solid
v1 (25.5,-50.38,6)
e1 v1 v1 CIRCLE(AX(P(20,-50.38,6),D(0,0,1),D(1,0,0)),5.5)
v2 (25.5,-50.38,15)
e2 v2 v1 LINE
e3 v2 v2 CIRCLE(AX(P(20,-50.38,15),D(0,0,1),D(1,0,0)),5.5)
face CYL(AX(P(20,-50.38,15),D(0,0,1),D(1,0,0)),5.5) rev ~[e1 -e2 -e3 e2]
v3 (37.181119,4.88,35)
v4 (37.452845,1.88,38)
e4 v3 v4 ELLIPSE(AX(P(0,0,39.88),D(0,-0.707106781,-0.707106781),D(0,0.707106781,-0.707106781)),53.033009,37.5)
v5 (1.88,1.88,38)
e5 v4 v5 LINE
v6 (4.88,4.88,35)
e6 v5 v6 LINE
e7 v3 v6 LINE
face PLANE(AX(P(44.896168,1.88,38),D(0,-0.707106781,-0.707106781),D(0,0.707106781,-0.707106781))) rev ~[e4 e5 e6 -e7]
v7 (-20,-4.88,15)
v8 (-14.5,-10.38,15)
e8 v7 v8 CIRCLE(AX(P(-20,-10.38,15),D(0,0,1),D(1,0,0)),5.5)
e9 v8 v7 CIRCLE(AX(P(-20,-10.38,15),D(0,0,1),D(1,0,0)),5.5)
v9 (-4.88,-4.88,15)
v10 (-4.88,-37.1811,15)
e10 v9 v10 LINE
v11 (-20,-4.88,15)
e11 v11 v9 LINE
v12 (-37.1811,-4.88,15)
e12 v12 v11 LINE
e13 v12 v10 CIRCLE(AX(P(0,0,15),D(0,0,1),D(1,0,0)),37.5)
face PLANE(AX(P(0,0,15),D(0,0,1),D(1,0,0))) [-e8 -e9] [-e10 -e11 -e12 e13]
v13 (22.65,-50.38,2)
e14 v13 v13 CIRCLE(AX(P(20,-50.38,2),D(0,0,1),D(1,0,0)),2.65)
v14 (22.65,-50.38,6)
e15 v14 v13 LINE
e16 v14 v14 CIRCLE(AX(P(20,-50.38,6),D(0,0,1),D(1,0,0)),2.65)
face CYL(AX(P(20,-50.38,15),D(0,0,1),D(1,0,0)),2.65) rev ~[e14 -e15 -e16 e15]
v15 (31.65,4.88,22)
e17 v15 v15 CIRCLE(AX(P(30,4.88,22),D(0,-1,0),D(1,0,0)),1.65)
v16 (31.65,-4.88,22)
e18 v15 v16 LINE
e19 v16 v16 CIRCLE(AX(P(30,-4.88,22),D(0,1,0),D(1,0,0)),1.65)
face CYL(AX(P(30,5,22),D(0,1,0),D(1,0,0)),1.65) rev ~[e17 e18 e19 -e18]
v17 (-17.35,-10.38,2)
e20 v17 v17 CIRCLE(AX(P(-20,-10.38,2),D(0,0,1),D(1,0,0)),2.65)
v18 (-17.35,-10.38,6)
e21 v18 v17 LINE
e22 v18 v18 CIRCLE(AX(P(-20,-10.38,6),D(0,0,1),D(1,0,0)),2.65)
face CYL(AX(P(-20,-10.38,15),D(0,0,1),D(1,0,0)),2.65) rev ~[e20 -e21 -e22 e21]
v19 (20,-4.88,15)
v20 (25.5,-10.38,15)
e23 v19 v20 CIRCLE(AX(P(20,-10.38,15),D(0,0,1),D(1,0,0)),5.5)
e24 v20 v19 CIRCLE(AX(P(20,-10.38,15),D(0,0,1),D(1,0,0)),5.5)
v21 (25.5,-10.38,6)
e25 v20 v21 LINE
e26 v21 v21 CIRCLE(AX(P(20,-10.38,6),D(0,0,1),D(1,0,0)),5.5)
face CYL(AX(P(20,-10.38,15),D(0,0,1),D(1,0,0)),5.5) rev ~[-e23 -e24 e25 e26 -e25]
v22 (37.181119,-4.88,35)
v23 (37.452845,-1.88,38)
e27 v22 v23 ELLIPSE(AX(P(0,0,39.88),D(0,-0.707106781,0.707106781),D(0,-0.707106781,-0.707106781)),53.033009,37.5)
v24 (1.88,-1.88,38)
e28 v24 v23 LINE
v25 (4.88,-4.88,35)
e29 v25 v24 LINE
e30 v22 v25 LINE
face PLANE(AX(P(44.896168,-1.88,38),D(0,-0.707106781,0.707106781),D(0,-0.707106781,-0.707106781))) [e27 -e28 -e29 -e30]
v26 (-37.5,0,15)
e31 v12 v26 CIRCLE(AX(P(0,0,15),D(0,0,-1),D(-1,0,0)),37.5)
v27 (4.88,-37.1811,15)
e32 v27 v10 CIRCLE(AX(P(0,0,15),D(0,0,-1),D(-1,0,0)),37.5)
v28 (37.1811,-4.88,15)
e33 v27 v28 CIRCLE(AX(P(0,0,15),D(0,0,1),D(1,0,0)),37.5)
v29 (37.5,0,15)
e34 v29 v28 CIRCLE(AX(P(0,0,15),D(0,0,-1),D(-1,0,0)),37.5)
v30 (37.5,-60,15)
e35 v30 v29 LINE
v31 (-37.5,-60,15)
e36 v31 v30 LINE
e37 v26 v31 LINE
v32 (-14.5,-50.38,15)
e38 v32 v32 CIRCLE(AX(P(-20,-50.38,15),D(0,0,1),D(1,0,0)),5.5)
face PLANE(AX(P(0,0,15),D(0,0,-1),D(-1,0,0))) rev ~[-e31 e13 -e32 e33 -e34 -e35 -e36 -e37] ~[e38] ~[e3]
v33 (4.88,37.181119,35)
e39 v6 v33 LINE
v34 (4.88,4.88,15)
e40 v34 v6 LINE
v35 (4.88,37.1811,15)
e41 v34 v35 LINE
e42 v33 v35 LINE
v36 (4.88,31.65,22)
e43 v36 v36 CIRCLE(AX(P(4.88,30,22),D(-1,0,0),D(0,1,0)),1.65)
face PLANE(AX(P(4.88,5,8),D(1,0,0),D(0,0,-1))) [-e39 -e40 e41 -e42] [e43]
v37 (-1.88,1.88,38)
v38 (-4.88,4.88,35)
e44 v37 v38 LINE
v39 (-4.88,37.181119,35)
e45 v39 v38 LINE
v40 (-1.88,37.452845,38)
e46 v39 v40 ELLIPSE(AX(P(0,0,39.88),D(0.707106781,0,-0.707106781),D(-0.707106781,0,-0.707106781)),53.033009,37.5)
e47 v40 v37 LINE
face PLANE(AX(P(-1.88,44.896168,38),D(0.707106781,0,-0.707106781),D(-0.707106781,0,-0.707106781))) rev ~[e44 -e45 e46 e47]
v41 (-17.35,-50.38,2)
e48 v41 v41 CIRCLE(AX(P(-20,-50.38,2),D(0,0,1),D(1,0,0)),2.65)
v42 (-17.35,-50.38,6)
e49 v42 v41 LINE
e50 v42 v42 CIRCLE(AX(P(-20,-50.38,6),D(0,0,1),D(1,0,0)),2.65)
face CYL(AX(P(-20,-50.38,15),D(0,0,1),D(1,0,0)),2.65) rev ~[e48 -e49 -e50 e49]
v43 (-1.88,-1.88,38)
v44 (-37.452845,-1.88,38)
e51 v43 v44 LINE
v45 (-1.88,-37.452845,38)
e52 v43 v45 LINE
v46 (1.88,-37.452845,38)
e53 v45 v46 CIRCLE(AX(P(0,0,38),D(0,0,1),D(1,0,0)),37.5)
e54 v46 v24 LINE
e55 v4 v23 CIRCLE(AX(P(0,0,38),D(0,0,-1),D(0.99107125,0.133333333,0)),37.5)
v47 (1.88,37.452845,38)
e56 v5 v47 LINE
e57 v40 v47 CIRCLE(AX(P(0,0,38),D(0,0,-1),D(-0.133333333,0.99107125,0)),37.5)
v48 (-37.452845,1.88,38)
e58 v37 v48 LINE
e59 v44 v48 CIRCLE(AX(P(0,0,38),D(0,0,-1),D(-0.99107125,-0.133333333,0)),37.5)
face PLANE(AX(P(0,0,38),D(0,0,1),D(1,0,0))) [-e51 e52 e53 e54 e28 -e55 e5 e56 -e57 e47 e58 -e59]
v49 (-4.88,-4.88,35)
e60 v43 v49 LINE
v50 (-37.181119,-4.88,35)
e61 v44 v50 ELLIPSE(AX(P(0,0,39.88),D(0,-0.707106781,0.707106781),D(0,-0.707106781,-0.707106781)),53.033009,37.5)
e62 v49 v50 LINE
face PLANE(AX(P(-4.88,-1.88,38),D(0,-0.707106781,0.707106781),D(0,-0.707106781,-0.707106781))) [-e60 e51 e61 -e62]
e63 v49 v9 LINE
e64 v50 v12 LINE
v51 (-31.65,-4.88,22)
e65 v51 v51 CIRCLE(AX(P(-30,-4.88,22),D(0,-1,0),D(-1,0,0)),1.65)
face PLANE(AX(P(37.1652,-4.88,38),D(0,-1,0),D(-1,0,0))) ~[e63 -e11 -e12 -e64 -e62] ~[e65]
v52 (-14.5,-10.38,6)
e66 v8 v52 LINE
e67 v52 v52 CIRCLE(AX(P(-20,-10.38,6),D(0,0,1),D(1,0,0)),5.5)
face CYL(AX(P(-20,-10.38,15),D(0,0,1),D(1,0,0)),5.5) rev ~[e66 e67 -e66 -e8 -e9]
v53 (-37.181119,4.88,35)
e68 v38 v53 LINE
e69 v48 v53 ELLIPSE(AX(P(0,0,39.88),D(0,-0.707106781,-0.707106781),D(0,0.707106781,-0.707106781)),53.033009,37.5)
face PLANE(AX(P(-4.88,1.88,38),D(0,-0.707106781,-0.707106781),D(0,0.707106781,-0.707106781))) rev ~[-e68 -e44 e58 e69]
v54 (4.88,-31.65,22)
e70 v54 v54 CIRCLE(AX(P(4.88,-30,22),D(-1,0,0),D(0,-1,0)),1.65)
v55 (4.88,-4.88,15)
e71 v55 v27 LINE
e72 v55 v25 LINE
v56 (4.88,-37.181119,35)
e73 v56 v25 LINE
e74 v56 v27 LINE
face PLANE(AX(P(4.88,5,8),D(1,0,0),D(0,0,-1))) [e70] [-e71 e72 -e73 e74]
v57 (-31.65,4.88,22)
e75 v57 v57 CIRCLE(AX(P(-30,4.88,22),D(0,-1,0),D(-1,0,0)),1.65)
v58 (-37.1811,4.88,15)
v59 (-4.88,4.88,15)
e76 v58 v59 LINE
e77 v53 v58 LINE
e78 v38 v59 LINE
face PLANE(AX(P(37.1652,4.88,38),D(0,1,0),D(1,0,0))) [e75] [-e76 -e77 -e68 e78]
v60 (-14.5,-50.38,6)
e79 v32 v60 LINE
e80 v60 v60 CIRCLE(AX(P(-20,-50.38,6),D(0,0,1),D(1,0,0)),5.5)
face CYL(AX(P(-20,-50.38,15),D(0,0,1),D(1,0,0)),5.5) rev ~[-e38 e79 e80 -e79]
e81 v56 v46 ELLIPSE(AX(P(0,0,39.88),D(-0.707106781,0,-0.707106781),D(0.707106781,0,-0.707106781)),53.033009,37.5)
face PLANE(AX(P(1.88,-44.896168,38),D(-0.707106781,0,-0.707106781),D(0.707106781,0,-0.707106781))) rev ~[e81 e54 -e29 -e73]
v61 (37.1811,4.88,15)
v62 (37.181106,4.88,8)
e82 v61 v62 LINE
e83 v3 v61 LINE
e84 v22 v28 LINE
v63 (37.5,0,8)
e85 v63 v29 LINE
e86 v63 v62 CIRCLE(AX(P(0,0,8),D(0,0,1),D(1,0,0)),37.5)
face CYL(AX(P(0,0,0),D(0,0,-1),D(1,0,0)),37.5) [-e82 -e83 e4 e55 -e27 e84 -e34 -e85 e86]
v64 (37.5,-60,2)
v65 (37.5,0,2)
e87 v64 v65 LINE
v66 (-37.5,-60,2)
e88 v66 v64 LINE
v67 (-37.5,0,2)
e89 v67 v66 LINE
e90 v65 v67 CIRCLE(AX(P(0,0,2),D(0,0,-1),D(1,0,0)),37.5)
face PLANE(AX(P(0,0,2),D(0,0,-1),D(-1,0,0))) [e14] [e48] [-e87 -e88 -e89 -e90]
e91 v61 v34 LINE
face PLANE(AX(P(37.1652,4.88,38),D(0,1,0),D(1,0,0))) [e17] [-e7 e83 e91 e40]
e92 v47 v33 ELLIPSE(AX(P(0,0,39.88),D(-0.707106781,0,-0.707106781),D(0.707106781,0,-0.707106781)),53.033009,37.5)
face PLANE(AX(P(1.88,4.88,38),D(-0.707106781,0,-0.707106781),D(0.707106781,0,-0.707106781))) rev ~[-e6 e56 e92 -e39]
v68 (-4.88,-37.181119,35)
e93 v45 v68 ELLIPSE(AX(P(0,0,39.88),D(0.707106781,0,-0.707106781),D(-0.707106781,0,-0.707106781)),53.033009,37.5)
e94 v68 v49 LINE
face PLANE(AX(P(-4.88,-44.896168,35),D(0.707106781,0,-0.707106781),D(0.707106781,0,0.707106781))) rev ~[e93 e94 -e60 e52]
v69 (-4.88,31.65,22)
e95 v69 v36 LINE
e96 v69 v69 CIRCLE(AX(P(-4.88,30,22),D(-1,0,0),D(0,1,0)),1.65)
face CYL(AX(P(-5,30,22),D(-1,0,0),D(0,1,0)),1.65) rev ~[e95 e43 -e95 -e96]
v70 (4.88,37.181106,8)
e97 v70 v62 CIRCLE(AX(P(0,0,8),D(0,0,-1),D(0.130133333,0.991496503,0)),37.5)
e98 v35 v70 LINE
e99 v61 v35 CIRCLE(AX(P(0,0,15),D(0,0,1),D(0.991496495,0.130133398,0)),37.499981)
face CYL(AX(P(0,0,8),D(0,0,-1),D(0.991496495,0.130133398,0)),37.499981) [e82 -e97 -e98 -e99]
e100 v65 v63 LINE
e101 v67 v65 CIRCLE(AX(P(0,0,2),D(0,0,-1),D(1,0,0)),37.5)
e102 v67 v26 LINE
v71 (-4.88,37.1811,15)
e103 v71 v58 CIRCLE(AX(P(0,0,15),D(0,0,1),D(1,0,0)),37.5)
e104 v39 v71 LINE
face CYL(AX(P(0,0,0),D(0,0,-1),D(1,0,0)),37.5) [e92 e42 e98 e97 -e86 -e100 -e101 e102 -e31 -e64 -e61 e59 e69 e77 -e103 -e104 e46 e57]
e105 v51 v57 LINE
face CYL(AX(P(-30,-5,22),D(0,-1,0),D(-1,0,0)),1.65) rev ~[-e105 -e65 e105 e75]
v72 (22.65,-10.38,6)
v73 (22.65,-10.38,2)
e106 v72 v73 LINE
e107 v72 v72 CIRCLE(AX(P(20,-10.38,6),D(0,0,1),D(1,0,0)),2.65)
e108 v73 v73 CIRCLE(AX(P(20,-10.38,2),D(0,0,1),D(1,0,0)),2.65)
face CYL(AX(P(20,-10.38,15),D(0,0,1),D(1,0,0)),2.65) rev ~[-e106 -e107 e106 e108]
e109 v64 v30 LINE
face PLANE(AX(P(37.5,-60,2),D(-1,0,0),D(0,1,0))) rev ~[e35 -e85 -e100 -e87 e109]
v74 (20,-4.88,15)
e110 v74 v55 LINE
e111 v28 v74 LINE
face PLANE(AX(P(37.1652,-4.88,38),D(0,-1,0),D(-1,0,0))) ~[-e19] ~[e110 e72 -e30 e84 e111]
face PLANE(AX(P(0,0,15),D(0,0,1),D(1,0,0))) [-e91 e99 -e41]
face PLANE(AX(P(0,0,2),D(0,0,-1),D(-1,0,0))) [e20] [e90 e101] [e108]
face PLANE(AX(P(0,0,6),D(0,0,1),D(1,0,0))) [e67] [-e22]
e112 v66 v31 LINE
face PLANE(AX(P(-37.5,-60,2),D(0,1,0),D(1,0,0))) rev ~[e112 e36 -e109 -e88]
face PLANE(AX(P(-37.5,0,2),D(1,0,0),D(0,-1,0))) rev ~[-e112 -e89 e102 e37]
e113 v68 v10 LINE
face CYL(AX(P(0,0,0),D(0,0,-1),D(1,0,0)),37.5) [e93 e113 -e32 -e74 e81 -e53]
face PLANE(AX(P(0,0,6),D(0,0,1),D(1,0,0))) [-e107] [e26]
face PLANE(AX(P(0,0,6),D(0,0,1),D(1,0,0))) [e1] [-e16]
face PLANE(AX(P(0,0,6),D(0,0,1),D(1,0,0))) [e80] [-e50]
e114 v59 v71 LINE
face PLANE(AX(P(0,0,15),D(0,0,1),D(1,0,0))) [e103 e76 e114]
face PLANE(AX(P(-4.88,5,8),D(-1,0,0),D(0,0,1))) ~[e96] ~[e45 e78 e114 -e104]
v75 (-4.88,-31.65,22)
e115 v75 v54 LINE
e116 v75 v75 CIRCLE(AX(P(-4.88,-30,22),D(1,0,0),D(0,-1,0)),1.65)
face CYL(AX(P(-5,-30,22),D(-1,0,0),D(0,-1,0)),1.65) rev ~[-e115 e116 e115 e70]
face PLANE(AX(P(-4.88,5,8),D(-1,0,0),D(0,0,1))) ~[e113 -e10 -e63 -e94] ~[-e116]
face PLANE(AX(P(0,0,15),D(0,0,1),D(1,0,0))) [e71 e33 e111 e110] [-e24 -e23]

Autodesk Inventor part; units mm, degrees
ref_plane "YZ Plane" through (0, 0, 0) normal (1, 0, 0) x (0, 1, 0)
ref_plane "XZ Plane" through (0, 0, 0) normal (0, 1, 0) x (-1, 0, 0)
ref_plane "XY Plane" through (0, 0, 0) normal (0, 0, 1) x (1, 0, 0)
sketch "Sketch1" plane through (0, 0, 0) normal (0, 0, 1) x (1, 0, 0)
  circle A0 centre (0, 0) radius 37.5
  line L0 (0, 0) -> (0, -25)
  circle A1 centre (0, -25) radius 3
  dimension "d0" = 75
  dimension "d1" = 25
  dimension "d2" = 6
extrude "Extrusion1" add sketch "Sketch1" along normal blind 8 contours A0 | A1
sketch "Sketch2" plane through (0, 0, 8) normal (0, 0, 1) x (1, 0, 0)
  line L0 (0, 0) -> (17.6777, 17.6777)
  line L1 (0, 0) -> (25, 0) construction
  circle A0 centre (17.6777, 17.6777) radius 3.15
  circle A1 centre (-17.6777, 17.6777) radius 3.15
  circle A2 centre (-17.6777, -17.6777) radius 3.15
  circle A3 centre (17.6777, -17.6777) radius 3.15
  dimension "d5" = 25
  dimension "d6" = 45
  dimension "d7" = 6.3
  dimension "d10" = 360
extrude "Extrusion2" cut sketch "Sketch2" against normal blind 10
sketch "Sketch3" plane through (0, 0, 8) normal (0, 0, 1) x (1, 0, 0)
  arc A0 (-21.9203, 13.435) -> (-13.435, 21.9203) centre (-17.6777, 17.6777) ccw
  line L0 (-17.6777, 17.6777) -> (-11.6777, 17.6777) construction
  line L1 (-13.435, 21.9203) -> (-19.9189, 28.4042)
  line L2 (-21.9203, 13.435) -> (-28.4042, 19.9189)
  line L3 (-28.4042, 19.9189) -> (-19.9189, 28.4042)
  arc A1 (-13.435, -21.9203) -> (-21.9203, -13.435) centre (-17.6777, -17.6777) ccw
  line L4 (-17.6777, -17.6777) -> (-17.6777, -11.6777) construction
  line L5 (-21.9203, -13.435) -> (-28.4042, -19.9189)
  line L6 (-13.435, -21.9203) -> (-19.9189, -28.4042)
  line L7 (-19.9189, -28.4042) -> (-28.4042, -19.9189)
  arc A2 (21.9203, -13.435) -> (13.435, -21.9203) centre (17.6777, -17.6777) ccw
  line L8 (17.6777, -17.6777) -> (11.6777, -17.6777) construction
  line L9 (13.435, -21.9203) -> (19.9189, -28.4042)
  line L10 (21.9203, -13.435) -> (28.4042, -19.9189)
  line L11 (28.4042, -19.9189) -> (19.9189, -28.4042)
  arc A3 (13.435, 21.9203) -> (21.9203, 13.435) centre (17.6777, 17.6777) ccw
  line L12 (17.6777, 17.6777) -> (17.6777, 11.6777) construction
  line L13 (21.9203, 13.435) -> (28.4042, 19.9189)
  line L14 (13.435, 21.9203) -> (19.9189, 28.4042)
  line L15 (19.9189, 28.4042) -> (28.4042, 19.9189)
  circle A4 centre (0, 0) radius 31.5
  point P0 (-26.1087, 17.6234)
  point P1 (-26.1087, -17.6234)
  point P2 (-17.6234, -26.1087)
  point P3 (17.6234, -26.1087)
  point P4 (26.1087, -17.6234)
  point P5 (26.1087, 17.6234)
  point P6 (17.6234, 26.1087)
  point P7 (-17.6234, 26.1087)
  dimension "d14" = 12
  dimension "d18" = 360
sketch "Sketch4" plane through (0, 0, 0) normal (0, 0, -1) x (-1, 0, 0)
  circle A0 centre (0, 0) radius 42.8826
extrude "Extrusion4" cut sketch "Sketch4" against normal blind 2
sketch "Sketch5" plane through (0, 0, 8) normal (0, 0, 1) x (1, 0, 0)
  line L0 (0, 0) -> (8, 0)
  line L1 (8, 0) -> (8, -40)
  line L2 (8, -40) -> (-8, -40)
  line L3 (-8, -40) -> (-8, 40)
  line L4 (-8, 40) -> (8, 40)
  line L5 (8, 40) -> (8, -40)
  line L6 (0, 0) -> (0, 8)
  line L7 (0, 8) -> (40, 8)
  line L8 (40, 8) -> (40, -8)
  line L9 (40, -8) -> (-40, -8)
  line L10 (-40, -8) -> (-40, 8)
  line L11 (-40, 8) -> (40, 8)
  line L12 (0, 0) -> (0, 40)
  line L13 (0, 40) -> (-5, 40)
  line L14 (-5, 40) -> (5, 40)
  line L15 (5, 40) -> (5, -40)
  line L16 (5, -40) -> (-5, -40)
  line L17 (-5, -40) -> (-5, 40)
  point P0 (8, -8)
  point P1 (8, 8)
  point P2 (-8, 8)
  point P3 (-8, -8)
  dimension "d24" = 8
  dimension "d25" = 40
  dimension "d26" = 16
  dimension "d27" = 80
  dimension "d30" = 90
  dimension "d34" = 5
  dimension "d35" = 10
sketch "Sketch6" plane through (0, 0, 8) normal (0, 0, 1) x (1, 0, 0)
  line L0 (0, 0) -> (0, 40)
  line L1 (0, 40) -> (-5, 40)
  line L2 (-5, 40) -> (5, 40)
  line L3 (5, 40) -> (5, -40)
  line L4 (5, -40) -> (-5, -40)
  line L5 (-5, -40) -> (-5, 40)
  line L6 (0, 0) -> (-40, 0)
  line L7 (-40, 0) -> (-40, -5)
  line L8 (-40, -5) -> (-40, 5)
  line L9 (-40, 5) -> (40, 5)
  line L10 (40, 5) -> (40, -5)
  line L11 (40, -5) -> (-40, -5)
  circle A0 centre (0, 0) radius 37.5
  point P0 (5, -5)
  point P1 (5, 5)
  point P2 (-5, 5)
  point P3 (-5, -5)
  point P4 (37.1652, 5)
  point P5 (5, 37.1652)
  point P6 (-5, 37.1652)
  point P7 (-37.1652, 5)
  point P8 (-37.1652, -5)
  point P9 (-5, -37.1652)
  point P10 (5, -37.1652)
  point P11 (37.1652, -5)
  dimension "d36" = 40
  dimension "d37" = 5
  dimension "d38" = 10
  dimension "d39" = 80
  dimension "d42" = 90
  dimension "d46" = 75
extrude "Extrusion7" add sketch "Sketch6" along normal blind 30 contours L6 L5 L9 L0 | L0 L9 L3 L11 L5 L6 | L9 L5 A0 L0 | L0 A0 L3 L9 | L6 A0 L9 L5 | L5 L11 A0 L6 | L9 A0 L11 L3 | L11 L3 A0 L5
sketch "Sketch7" plane through (5, 5, 8) normal (0, 1, 0) x (1, 0, 0)
  line L0 (0, 0) -> (0, -30) projected
  line L1 (0, 0) -> (-5, 0)
  line L2 (-5, 0) -> (25, 0)
  line L3 (0, 0) -> (32.1652, 0) projected
  line L4 (25, 0) -> (25, -14)
  circle A0 centre (25, -14) radius 1.65
  point P0 (-5, 8)
  dimension "d49" = 5
  dimension "d50" = 30
  dimension "d51" = 14
  dimension "d52" = 3.3
extrude "Extrusion8" cut sketch "Sketch7" against normal blind 20
ref_plane "Work Plane1" through (5, 0, 8) normal (0, 1, 0) x (1, 0, 0)
ref_plane "Work Plane2" through (0, 5, 8) normal (1, 0, 0) x (0, 0, -1)
pattern_circular "Circular Pattern2" count 2 over 90 about axis through (0, 0, 8) along (0, 0, 1) of "Extrusion8"
sketch "Sketch8" plane through (-37.1652, 5, 8) normal (0, 1, 0) x (1, 0, 0)
  line L0 (32.1652, 0) -> (32.1652, -30) projected
  line L1 (32.1652, 0) -> (37.1652, 0)
  line L2 (37.1652, 0) -> (5.9902, 0)
  line L3 (22.6375, 0) -> (16.3375, 0) projected
  line L4 (5.9902, 0) -> (5.9902, -14)
  circle A0 centre (5.9902, -14) radius 2.15
  point P0 (37.1652, 8)
  dimension "d61" = 31.175
  dimension "d62" = 14
  dimension "d63" = 4.3
extrude "Extrusion9" [suppressed]
pattern_circular "Circular Pattern3" count 2 over 360 about axis through (0, 0, 8) along (0, 0, -1) of "Extrusion8"
sketch "Sketch10" plane through (5, 5, 8) normal (1, 0, 0) x (0, 0, -1)
  line L0 (0, 0) -> (-30, 0) projected
  line L1 (0, 0) -> (-30, 0)
  line L2 (-30, 0) -> (-30, 35.3175)
  line L3 (-30, 35.3175) -> (0, 35.3175)
  line L4 (0, 35.3175) -> (0, 0)
  line L5 (0, -10) -> (-30, -10) projected
  line L6 (0, -10) -> (-32.3439, -10)
  line L7 (-32.3439, -10) -> (-32.3439, -45.8466)
  line L8 (-32.3439, -45.8466) -> (0, -45.8466)
  line L9 (0, -45.8466) -> (0, -10)
  point P0 (8, -5)
extrude "Extrusion11" cut sketch "Sketch10" against normal blind 0.12
mirror "Mirror2" about plane through (0, 5, 8) normal (1, 0, 0) of "Extrusion11"
sketch "Sketch11" plane through (37.1652, 5, 38) normal (0, 1, 0) x (1, 0, 0)
  line L0 (-32.2852, 30) -> (-32.2852, 0) projected
  line L1 (-32.2852, 30) -> (5.1404, 30)
  line L2 (5.1404, 30) -> (5.1404, -1.2125)
  line L3 (5.1404, -1.2125) -> (-32.2852, -1.2125)
  line L4 (-32.2852, -1.2125) -> (-32.2852, 30)
  line L5 (-74.3303, 30) -> (-42.0452, 30) projected
  line L6 (-42.0452, 30) -> (-76.613, 30)
  line L7 (-76.613, 30) -> (-76.613, -1.2125)
  line L8 (-76.613, -1.2125) -> (-42.0452, -1.2125)
  line L9 (-42.0452, -1.2125) -> (-42.0452, 30)
  point P0 (-37.1652, 38)
extrude "Extrusion12" cut sketch "Sketch11" against normal blind 0.12
mirror "Mirror3" about plane through (5, 0, 8) normal (0, 1, 0) of "Extrusion12"
mirror "Mirror4" about plane through (5, 0, 8) normal (0, 1, 0) of "Extrusion8", "Circular Pattern2"
chamfer "Chamfer4" distance 3 angle 45 8 edges at (21.0306, 4.88, 38) (-21.0306, 4.88, 38) (4.88, -21.0306, 38) (4.88, 21.0306, 38) (-4.88, -21.0306, 38) (-4.88, 21.0306, 38) (21.0306, -4.88, 38) (-21.0306, -4.88, 38)
sketch "Sketch13" plane through (0, 0, 8) normal (0, 0, 1) x (1, 0, 0)
  arc A0 (37.1811, 4.88) -> (4.88, 37.1811) centre (0, 0) ccw projected
  circle A1 centre (0, 0) radius 37.5
  line L0 (37.1811, 4.88) -> (4.88, 4.88) projected
  line L1 (4.88, 4.88) -> (4.88, 37.1811) projected
  line L2 (37.1811, 4.88) -> (4.88, 4.88)
  line L3 (4.88, 4.88) -> (4.88, 37.1811)
  line L4 (4.88, 37.1811) -> (37.1811, 37.1811)
  line L5 (37.1811, 37.1811) -> (37.1811, 4.88)
  circle A2 centre (17.6777, 17.6777) radius 3.15 projected
  circle A3 centre (17.6777, 17.6777) radius 6
  line L6 (0, 0) -> (0, 7.2893)
  line L7 (0, 0) -> (7.7636, 0)
  arc A4 (-4.88, 37.1811) -> (-37.1811, 4.88) centre (0, 0) ccw
  circle A5 centre (0, 0) radius 37.5
  line L8 (-37.1811, 4.88) -> (-4.88, 4.88)
  line L9 (-4.88, 4.88) -> (-4.88, 37.1811)
  line L10 (-37.1811, 4.88) -> (-4.88, 4.88)
  line L11 (-4.88, 4.88) -> (-4.88, 37.1811)
  line L12 (-4.88, 37.1811) -> (-37.1811, 37.1811)
  line L13 (-37.1811, 37.1811) -> (-37.1811, 4.88)
  circle A6 centre (-17.6777, 17.6777) radius 3.15
  circle A7 centre (-17.6777, 17.6777) radius 6
  arc A8 (4.88, -37.1811) -> (37.1811, -4.88) centre (0, 0) ccw
  circle A9 centre (0, 0) radius 37.5
  line L14 (37.1811, -4.88) -> (4.88, -4.88)
  line L15 (4.88, -4.88) -> (4.88, -37.1811)
  line L16 (37.1811, -4.88) -> (4.88, -4.88)
  line L17 (4.88, -4.88) -> (4.88, -37.1811)
  line L18 (4.88, -37.1811) -> (37.1811, -37.1811)
  line L19 (37.1811, -37.1811) -> (37.1811, -4.88)
  circle A10 centre (17.6777, -17.6777) radius 3.15
  circle A11 centre (17.6777, -17.6777) radius 6
  line L20 (0, 0) -> (0, -7.2893)
  arc A12 (-37.1811, -4.88) -> (-4.88, -37.1811) centre (0, 0) ccw
  circle A13 centre (0, 0) radius 37.5
  line L21 (-37.1811, -4.88) -> (-4.88, -4.88)
  line L22 (-4.88, -4.88) -> (-4.88, -37.1811)
  line L23 (-37.1811, -4.88) -> (-4.88, -4.88)
  line L24 (-4.88, -4.88) -> (-4.88, -37.1811)
  line L25 (-4.88, -37.1811) -> (-37.1811, -37.1811)
  line L26 (-37.1811, -37.1811) -> (-37.1811, -4.88)
  circle A14 centre (-17.6777, -17.6777) radius 3.15
  circle A15 centre (-17.6777, -17.6777) radius 6
  arc A16 (1.88, 37.4528) -> (-1.88, 37.4528) centre (0, 0) ccw projected
  line L27 (1.88, 37.4528) -> (-1.88, 37.4528)
  line L28 (4.88, 37.1811) -> (17.88, 37.1811)
  line L29 (4.88, 37.1811) -> (4.88, 24.0161)
  point P0 (-37.1811, -4.88)
  dimension "d96" = 12
  dimension "d97" = 13
  dimension "d98" = 13.165
extrude "Extrusion14" add sketch "Sketch13" along normal blind 7 contours L0 L1 A0 | A1 L15 L14 | L9 L8 A1 | A1 L21 L22
sketch "Sketch19" plane through (0, 0, 2) normal (0, 0, -1) x (-1, 0, 0)
  circle A0 centre (-17.6777, 17.6777) radius 3.15 projected
  circle A1 centre (-17.6777, 17.6777) radius 9.67
  circle A2 centre (17.6777, 17.6777) radius 3.15 projected
  circle A3 centre (17.6777, 17.6777) radius 9.0628
  circle A4 centre (17.6777, -17.6777) radius 3.15 projected
  circle A5 centre (17.6777, -17.6777) radius 10.6824
  circle A6 centre (-17.6777, -17.6777) radius 3.15 projected
  circle A7 centre (-17.6777, -17.6777) radius 10.6824
  point P0 (0, 0)
extrude "Extrusion19" add sketch "Sketch19" against normal blind 13 contours A0 | A1 | A2 | A3 | A4 | A5 | A6 | A7
sketch "Sketch21" plane through (0, 0, 2) normal (0, 0, -1) x (-1, 0, 0)
  circle A0 centre (0, 0) radius 37.5 projected
  line L0 (-37.5, 0) -> (37.5, 0)
  line L1 (37.5, 0) -> (37.5, -60)
  line L2 (37.5, -60) -> (-37.5, -60)
  line L3 (-37.5, -60) -> (-37.5, 0)
  dimension "d145" = 75
  dimension "d146" = 60
extrude "Extrusion22" add sketch "Sketch21" against normal blind 13 contours L1 L2 L3 A0
sketch "Sketch22" plane through (0, 0, 15) normal (0, 0, 1) x (1, 0, 0)
  line L0 (0, 0) -> (20, 0)
  line L1 (20, 0) -> (20, -4.88)
  line L2 (4.88, -4.88) -> (37.1811, -4.88) projected
  line L3 (20, -4.88) -> (20, -10.38)
  line L4 (0, 0) -> (-20, 0)
  line L5 (-20, 0) -> (-20, -4.88)
  line L6 (-37.1811, -4.88) -> (-4.88, -4.88) projected
  line L7 (-20, -4.88) -> (-20, -10.38)
  line L8 (-20, -10.38) -> (20, -10.38)
  line L9 (20, -10.38) -> (20, -50.38)
  line L10 (20, -50.38) -> (-20, -50.38)
  line L11 (-20, -50.38) -> (-20, -10.38)
  circle A0 centre (-20, -50.38) radius 2.65
  circle A1 centre (-20, -10.38) radius 2.65
  circle A2 centre (20, -10.38) radius 2.65
  circle A3 centre (20, -50.38) radius 2.65
  dimension "d149" = 20
  dimension "d150" = 5.5
  dimension "d151" = 20
  dimension "d152" = 5.5
  dimension "d153" = 40
  dimension "d154" = 40
  dimension "d155" = 5.3
  dimension "d156" = 5.3
  dimension "d157" = 5.3
  dimension "d158" = 5.3
extrude "Extrusion23" cut sketch "Sketch22" against normal blind 13 contours A2 L9 L3 | L3 L8 A2 | A1 L8 L7 | L7 L11 A1 | L9 A2 L8 | L8 A1 L11 | A0 L10 L11 | L11 L10 A0 | A3 L10 L9 | L9 L10 A3
sketch "Sketch23" plane through (0, 0, 15) normal (0, 0, 1) x (1, 0, 0)
  circle A0 centre (-20, -10.38) radius 2.65 projected
  circle A1 centre (-20, -10.38) radius 5.5
  line L0 (-37.1811, -4.88) -> (-4.88, -4.88) projected
  circle A2 centre (20, -10.38) radius 2.65 projected
  circle A3 centre (20, -10.38) radius 5.5
  circle A4 centre (20, -50.38) radius 2.65 projected
  circle A5 centre (20, -50.38) radius 5.5
  circle A6 centre (-20, -50.38) radius 2.65 projected
  circle A7 centre (-20, -50.38) radius 5.5
  point P0 (0, 0)
  dimension "d161" = 11
  dimension "d162" = 11
extrude "Extrusion24" cut sketch "Sketch23" against normal blind 9 contours A0 | A1 | A3 | A4 | A5 | A6 | A7
properties part number "Test_Stand_Mounting_Plate"
